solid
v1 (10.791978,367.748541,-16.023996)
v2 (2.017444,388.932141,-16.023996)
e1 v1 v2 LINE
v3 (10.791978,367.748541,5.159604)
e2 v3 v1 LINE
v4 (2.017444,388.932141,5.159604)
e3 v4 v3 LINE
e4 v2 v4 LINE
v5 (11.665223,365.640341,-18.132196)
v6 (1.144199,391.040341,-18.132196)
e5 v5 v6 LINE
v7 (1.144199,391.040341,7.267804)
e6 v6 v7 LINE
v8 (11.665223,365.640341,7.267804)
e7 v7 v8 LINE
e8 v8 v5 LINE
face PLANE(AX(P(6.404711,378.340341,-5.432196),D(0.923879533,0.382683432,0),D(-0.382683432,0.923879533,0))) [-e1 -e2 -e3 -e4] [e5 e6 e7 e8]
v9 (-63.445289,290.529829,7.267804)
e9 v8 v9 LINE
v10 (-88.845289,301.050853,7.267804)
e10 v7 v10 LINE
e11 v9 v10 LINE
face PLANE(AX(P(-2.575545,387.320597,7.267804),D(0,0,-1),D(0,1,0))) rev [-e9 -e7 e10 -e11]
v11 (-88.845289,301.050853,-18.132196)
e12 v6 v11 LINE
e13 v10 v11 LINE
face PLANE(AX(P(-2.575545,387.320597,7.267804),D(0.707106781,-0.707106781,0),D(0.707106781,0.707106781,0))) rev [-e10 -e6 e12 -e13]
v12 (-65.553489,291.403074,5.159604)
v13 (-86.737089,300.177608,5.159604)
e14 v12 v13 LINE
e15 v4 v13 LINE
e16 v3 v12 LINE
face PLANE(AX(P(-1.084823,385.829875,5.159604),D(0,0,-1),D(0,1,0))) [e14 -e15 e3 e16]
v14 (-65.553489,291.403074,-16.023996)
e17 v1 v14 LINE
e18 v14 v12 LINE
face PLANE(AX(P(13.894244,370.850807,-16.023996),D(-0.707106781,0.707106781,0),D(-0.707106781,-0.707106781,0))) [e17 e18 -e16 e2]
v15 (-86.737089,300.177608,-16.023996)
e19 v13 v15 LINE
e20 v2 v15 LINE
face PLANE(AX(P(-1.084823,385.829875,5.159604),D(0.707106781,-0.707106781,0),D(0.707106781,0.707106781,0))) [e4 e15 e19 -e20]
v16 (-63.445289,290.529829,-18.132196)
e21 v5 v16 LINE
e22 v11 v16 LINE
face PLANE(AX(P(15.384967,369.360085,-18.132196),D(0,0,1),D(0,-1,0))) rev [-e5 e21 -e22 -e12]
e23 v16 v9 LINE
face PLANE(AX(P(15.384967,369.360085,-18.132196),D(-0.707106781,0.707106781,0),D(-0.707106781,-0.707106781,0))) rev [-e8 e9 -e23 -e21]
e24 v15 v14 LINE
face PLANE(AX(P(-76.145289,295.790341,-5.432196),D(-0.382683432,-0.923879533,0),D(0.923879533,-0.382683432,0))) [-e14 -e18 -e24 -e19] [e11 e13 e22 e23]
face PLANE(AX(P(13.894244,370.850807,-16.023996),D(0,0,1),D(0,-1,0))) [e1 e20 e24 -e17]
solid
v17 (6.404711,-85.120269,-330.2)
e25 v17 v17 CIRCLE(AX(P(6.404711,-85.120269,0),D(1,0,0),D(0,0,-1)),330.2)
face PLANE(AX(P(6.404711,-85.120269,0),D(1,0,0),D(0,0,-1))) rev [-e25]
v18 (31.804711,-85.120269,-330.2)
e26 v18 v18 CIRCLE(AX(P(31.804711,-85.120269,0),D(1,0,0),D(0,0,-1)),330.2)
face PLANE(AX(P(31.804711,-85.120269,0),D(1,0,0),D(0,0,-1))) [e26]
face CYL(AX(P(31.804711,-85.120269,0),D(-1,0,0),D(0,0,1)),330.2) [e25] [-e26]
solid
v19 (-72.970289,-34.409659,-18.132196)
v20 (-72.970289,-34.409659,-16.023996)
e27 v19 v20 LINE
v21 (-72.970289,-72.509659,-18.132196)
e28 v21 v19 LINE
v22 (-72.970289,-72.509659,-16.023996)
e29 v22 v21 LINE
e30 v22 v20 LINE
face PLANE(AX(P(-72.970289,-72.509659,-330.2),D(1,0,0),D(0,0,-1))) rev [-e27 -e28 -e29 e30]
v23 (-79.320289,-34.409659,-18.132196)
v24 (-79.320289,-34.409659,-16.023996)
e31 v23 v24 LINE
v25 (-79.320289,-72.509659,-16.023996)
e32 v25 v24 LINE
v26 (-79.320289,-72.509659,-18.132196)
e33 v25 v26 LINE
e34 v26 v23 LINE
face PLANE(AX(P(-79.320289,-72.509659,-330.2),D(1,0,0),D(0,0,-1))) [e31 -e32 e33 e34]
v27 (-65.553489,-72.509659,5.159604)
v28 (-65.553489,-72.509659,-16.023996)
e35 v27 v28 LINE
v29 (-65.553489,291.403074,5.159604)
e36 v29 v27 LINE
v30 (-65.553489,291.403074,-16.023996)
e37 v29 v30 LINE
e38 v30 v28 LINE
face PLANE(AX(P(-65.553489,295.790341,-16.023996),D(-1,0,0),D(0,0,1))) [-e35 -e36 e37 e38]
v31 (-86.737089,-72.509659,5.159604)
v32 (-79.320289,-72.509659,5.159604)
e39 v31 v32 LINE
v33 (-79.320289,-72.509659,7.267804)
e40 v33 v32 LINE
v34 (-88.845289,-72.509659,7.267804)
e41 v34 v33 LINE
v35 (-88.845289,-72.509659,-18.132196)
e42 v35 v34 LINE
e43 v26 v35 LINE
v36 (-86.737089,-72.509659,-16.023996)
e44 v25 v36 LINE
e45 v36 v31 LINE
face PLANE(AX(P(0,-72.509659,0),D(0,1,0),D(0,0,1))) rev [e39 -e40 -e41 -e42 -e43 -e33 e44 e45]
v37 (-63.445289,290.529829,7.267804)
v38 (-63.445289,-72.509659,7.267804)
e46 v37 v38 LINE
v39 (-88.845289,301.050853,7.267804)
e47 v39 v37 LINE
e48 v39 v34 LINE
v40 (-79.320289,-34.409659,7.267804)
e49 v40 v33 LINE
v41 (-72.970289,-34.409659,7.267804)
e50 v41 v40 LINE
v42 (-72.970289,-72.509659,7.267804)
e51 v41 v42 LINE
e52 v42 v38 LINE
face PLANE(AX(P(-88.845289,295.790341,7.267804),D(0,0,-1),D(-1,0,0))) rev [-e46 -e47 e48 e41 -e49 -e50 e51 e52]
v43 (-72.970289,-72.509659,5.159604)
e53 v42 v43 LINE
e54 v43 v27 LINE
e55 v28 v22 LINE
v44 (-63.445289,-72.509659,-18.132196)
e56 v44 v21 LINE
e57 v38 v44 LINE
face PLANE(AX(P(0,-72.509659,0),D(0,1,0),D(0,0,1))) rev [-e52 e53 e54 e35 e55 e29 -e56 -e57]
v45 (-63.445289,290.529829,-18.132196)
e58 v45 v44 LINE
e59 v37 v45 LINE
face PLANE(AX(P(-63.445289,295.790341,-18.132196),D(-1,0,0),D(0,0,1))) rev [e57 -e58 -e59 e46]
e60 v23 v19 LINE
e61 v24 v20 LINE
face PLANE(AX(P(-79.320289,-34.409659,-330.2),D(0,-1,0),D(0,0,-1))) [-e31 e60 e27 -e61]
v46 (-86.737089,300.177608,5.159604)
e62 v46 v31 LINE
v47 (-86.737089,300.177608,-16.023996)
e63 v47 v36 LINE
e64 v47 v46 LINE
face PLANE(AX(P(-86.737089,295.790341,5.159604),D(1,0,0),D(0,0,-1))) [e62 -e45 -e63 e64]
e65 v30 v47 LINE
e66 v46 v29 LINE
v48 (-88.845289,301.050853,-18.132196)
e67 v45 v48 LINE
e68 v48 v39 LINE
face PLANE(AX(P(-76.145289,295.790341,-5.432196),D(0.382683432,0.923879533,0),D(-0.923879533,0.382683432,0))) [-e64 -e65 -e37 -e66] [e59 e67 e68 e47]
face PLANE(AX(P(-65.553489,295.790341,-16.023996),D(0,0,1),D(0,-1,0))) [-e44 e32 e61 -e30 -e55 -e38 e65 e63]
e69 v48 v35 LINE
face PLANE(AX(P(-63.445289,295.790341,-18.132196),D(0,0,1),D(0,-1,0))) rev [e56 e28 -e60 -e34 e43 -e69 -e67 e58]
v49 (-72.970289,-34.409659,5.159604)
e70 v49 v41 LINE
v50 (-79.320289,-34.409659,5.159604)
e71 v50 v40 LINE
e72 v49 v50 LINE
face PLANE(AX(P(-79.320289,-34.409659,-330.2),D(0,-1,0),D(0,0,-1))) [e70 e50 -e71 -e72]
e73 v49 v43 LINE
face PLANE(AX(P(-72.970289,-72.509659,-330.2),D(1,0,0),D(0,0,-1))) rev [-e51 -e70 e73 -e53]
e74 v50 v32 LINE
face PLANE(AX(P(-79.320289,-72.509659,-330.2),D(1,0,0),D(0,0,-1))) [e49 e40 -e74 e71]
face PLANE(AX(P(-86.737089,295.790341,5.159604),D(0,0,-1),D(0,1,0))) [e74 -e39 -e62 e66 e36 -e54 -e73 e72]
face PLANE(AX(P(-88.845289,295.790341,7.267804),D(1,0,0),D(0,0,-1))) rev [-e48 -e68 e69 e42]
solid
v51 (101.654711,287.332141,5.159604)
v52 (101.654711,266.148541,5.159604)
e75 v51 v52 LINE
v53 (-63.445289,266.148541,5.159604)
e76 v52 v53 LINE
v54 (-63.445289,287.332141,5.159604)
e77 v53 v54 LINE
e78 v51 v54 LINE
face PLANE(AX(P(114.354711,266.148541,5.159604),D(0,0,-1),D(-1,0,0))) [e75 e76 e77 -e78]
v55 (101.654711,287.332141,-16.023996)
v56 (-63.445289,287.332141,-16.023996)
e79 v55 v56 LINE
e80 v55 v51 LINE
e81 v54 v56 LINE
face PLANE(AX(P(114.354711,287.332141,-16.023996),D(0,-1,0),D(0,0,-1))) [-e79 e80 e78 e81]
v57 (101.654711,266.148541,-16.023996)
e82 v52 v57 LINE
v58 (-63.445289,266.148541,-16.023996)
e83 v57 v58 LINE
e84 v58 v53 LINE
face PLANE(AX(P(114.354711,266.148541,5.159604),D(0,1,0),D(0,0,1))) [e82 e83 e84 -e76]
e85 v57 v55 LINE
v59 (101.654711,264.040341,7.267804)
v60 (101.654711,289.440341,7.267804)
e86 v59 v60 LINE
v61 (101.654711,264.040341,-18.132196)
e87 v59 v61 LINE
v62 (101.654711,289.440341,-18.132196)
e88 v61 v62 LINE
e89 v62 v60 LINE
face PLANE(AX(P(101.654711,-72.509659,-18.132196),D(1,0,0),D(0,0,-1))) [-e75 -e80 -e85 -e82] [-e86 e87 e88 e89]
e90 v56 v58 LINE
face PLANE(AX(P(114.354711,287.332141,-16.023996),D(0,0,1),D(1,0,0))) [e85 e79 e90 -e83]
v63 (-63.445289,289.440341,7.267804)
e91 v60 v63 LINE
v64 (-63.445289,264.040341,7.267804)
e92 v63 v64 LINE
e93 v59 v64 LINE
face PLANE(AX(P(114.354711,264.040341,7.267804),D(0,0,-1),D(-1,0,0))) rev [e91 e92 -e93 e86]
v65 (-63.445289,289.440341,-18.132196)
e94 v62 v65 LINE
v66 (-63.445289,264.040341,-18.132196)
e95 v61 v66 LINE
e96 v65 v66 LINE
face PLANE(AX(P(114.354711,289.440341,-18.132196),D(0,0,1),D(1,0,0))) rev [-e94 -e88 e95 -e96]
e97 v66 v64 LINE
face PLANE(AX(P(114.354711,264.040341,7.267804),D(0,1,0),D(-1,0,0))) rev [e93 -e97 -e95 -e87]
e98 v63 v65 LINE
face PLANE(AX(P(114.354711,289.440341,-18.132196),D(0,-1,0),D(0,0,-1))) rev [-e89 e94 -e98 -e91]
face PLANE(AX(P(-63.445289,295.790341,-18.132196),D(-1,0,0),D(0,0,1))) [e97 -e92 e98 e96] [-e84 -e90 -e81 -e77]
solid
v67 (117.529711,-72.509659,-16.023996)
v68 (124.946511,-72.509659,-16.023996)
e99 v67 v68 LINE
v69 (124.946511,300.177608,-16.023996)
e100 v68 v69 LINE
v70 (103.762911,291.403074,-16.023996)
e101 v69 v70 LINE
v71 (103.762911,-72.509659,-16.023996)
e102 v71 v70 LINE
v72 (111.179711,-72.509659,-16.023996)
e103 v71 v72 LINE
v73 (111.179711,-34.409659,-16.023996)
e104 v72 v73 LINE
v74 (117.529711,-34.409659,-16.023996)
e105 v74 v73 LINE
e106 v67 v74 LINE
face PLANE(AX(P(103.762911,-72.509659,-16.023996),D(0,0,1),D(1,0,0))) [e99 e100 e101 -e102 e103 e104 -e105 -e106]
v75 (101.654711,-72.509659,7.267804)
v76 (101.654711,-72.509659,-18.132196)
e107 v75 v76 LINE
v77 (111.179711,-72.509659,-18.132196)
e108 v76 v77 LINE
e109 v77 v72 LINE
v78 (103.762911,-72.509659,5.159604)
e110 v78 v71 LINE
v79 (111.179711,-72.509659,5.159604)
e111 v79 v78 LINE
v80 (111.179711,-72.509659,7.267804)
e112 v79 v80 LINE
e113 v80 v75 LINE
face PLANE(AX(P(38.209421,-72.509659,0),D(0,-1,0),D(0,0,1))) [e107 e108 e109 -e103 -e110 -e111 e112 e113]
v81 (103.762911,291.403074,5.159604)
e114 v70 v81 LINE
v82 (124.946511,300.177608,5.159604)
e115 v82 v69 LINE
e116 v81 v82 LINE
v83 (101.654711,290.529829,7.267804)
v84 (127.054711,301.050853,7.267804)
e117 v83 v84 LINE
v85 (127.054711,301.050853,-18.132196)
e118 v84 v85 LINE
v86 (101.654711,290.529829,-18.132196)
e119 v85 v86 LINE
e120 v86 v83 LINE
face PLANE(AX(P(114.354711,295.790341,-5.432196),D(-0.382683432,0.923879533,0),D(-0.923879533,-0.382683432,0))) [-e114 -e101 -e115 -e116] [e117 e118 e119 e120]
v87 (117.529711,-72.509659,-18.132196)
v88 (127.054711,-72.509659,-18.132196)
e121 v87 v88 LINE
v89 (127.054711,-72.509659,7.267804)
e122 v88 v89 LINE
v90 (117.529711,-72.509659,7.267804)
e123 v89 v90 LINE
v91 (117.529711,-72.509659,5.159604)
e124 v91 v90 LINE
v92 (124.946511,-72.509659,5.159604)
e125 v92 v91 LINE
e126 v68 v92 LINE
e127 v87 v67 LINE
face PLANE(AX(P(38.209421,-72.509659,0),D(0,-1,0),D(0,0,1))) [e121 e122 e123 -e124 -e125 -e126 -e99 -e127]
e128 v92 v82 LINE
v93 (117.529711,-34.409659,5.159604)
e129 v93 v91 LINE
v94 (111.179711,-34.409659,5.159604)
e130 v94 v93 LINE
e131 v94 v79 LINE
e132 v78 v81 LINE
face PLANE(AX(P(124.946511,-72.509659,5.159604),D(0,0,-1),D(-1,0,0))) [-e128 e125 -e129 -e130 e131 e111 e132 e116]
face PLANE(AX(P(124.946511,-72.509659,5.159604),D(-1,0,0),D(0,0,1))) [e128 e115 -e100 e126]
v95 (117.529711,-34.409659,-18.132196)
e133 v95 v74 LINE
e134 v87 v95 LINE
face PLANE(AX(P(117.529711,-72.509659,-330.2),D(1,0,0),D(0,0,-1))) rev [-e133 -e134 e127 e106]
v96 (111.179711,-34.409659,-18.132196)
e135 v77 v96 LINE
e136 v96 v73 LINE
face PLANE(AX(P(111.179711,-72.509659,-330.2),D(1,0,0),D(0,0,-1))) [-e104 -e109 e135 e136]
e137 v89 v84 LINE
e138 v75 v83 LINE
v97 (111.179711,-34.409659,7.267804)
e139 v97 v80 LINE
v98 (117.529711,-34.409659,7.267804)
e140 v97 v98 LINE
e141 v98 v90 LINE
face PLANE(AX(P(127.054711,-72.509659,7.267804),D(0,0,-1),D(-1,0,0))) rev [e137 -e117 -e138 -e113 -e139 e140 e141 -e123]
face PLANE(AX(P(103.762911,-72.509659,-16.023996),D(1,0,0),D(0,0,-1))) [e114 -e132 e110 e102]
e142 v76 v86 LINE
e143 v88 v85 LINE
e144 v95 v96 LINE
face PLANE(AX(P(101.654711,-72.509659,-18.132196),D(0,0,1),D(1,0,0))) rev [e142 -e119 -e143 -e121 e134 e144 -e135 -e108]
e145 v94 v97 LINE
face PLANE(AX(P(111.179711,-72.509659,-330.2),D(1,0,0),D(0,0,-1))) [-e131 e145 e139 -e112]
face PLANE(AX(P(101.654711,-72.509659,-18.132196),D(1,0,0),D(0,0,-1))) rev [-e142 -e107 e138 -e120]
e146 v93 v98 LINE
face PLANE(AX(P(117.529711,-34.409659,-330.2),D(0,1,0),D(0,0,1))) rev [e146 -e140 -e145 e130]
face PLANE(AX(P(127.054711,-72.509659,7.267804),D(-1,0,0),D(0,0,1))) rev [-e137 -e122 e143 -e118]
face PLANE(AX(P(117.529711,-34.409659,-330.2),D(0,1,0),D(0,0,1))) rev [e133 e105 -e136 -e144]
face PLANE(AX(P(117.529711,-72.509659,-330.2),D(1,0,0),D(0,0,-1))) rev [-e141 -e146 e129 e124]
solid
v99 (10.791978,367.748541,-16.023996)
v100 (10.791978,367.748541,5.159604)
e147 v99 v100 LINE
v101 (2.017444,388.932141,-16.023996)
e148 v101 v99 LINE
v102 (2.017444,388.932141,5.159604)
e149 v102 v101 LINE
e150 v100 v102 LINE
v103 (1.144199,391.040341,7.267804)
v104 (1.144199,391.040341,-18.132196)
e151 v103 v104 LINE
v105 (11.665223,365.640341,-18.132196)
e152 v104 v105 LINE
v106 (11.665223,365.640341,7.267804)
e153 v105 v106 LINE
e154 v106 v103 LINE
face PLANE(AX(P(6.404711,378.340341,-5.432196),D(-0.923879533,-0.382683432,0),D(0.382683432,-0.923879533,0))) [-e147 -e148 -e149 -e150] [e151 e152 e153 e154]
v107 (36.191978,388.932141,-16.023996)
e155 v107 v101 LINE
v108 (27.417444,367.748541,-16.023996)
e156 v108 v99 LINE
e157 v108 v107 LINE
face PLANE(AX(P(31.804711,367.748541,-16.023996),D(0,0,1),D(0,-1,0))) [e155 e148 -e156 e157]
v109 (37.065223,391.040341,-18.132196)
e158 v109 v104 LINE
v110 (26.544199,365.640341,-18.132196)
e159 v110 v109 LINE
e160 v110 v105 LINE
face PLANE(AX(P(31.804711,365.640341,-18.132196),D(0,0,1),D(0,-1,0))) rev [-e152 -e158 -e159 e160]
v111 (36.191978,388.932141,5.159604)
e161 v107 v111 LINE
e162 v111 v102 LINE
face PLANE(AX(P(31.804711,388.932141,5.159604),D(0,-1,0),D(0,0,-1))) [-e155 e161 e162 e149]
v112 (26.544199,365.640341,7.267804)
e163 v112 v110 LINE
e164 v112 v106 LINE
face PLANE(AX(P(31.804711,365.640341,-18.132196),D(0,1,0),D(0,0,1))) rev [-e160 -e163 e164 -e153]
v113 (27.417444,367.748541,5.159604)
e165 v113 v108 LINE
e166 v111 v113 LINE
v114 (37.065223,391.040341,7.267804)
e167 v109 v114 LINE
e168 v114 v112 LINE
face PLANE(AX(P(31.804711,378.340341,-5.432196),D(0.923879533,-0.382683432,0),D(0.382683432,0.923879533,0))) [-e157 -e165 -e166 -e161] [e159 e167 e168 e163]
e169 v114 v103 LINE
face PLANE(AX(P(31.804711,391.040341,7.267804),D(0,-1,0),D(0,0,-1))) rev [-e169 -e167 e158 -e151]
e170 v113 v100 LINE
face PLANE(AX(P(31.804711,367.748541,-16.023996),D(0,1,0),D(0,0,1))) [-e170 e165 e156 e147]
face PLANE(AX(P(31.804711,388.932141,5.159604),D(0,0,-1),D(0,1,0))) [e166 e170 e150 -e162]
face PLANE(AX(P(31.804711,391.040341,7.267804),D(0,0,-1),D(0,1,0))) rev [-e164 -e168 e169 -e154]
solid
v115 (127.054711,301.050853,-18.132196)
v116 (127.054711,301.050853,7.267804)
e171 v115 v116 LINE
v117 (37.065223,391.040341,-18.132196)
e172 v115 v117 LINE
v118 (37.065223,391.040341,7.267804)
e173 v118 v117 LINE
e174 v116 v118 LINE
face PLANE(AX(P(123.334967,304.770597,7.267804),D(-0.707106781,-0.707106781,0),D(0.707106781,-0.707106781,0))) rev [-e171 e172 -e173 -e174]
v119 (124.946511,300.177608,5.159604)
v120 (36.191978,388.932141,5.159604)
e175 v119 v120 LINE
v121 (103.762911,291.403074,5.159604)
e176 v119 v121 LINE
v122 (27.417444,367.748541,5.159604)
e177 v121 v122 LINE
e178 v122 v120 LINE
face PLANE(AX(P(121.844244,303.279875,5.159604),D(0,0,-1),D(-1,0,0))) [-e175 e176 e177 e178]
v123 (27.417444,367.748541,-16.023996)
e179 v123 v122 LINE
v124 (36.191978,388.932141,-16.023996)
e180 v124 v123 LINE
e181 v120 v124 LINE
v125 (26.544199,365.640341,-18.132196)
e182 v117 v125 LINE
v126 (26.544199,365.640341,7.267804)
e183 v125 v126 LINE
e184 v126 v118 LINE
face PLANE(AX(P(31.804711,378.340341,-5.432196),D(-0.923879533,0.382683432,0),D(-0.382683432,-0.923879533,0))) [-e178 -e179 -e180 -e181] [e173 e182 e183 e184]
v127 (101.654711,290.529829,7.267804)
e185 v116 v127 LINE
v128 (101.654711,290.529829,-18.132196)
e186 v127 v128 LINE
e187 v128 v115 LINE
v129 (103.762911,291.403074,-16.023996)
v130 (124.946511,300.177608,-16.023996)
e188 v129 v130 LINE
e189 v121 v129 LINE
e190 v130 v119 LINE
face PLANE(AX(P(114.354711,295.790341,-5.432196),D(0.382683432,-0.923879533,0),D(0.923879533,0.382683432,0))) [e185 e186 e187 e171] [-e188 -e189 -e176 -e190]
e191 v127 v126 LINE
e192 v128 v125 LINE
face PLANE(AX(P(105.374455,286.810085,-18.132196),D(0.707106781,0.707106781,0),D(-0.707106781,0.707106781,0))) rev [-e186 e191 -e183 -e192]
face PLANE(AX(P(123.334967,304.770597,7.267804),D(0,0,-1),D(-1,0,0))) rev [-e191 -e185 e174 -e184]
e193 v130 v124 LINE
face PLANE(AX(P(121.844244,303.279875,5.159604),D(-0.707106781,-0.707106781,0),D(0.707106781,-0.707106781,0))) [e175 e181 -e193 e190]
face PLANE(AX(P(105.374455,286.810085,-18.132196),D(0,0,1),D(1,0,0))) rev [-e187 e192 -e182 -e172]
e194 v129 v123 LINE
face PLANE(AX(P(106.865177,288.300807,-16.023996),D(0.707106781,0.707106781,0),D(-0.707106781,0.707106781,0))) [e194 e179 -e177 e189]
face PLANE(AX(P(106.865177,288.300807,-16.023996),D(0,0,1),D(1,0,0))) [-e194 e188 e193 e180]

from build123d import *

# Parameters (mm, degrees)
WHEEL_START                                    = 6.404710745
WHEEL_OUTLINE_R                                = 330.2
WHEEL_DEPTH                                    = 25.4
SKETCH11_W                                     = 25.4
SKETCH11_H                                     = 25.4
SKETCH11_W_2                                   = 21.1836
SKETCH11_H_2                                   = 21.1836
AL_TUBE_SQUARE_AL_TUBE_1_SQR_X_0_083_WAL_DEPTH = 376.739487758
SKETCH11_ON_SEGMENT_2_W                        = 25.4
SKETCH11_ON_SEGMENT_2_H                        = 25.4
SKETCH11_ON_SEGMENT_2_W_2                      = 21.1836
SKETCH11_ON_SEGMENT_2_H_2                      = 21.1836
AL_TUBE_SQUARE_AL_TUBE_1_SQR_X_0_083_3_DEPTH   = 133.622305091
SKETCH11_ON_SEGMENT_3_W                        = 25.4
SKETCH11_ON_SEGMENT_3_H                        = 25.4
SKETCH11_ON_SEGMENT_3_W_2                      = 21.1836
SKETCH11_ON_SEGMENT_3_H_2                      = 21.1836
AL_TUBE_SQUARE_AL_TUBE_1_SQR_X_0_083_5_DEPTH   = 42.278975516
SKETCH11_ON_SEGMENT_4_W                        = 25.4
SKETCH11_ON_SEGMENT_4_H                        = 25.4
SKETCH11_ON_SEGMENT_4_W_2                      = 21.1836
SKETCH11_ON_SEGMENT_4_H_2                      = 21.1836
AL_TUBE_SQUARE_AL_TUBE_1_SQR_X_0_083_7_DEPTH   = 133.622305091
SKETCH11_ON_SEGMENT_5_W                        = 25.4
SKETCH11_ON_SEGMENT_5_H                        = 25.4
SKETCH11_ON_SEGMENT_5_W_2                      = 21.1836
SKETCH11_ON_SEGMENT_5_H_2                      = 21.1836
AL_TUBE_SQUARE_AL_TUBE_1_SQR_X_0_083_9_DEPTH   = 376.739487758
SKETCH11_ON_SEGMENT_6_W                        = 25.4
SKETCH11_ON_SEGMENT_6_H                        = 25.4
SKETCH11_ON_SEGMENT_6_W_2                      = 21.1836
SKETCH11_ON_SEGMENT_6_H_2                      = 21.1836
AL_TUBE_SQUARE_AL_TUBE_1_SQR_X_0_083_10_DEPTH  = 192.500000002
CUT_EXTRUDE1_DEPTH                             = 551.016675996
CUT_EXTRUDE1_DEPTH_BACK                        = 551.016675996
SKETCH16_W                                     = 6.35
SKETCH16_H                                     = 38.1


# Read off the part's stored shape, not the designer's step: wheel
with BuildPart() as part:
    # wheel outline → wheel (new body)
    with BuildSketch(Plane.YZ.offset(WHEEL_START)):
        with Locations((-85.120268568, 0)):
            Circle(WHEEL_OUTLINE_R)
    extrude(amount=WHEEL_DEPTH)


with BuildPart() as body_2:
    # Sketch11 → Al tube square AL TUBE 1 SQR X 0.083 WALL(1) (new body)
    with BuildSketch(Plane(origin=(-76.145289254, -72.509659064, -5.432195809), x_dir=(1, 0, 0), z_dir=(0, 1, 0))):
        Rectangle(SKETCH11_W, SKETCH11_H)
        Rectangle(SKETCH11_W_2, SKETCH11_H_2, mode=Mode.SUBTRACT)
    extrude(amount=AL_TUBE_SQUARE_AL_TUBE_1_SQR_X_0_083_WAL_DEPTH)

    # Al tube square AL TUBE 1 SQR X 0.083 2
    split(bisect_by=Plane(origin=(-76.145289254, 295.790340936, -5.432195809), x_dir=(0.923879533, -0.382683432, 0), z_dir=(-0.382683432, -0.923879533, 0)), keep=Keep.TOP)


with BuildPart() as body_3:
    # Sketch11 on segment 2 (carried to segment 2) → Al tube square AL TUBE 1 SQR X 0.083 3 (new body)
    with BuildSketch(Plane(origin=(-82.112908278, 289.822721913, -5.432195809), x_dir=(0.707106781, -0.707106781, 0), z_dir=(0.707106781, 0.707106781, 0))):
        Rectangle(SKETCH11_ON_SEGMENT_2_W, SKETCH11_ON_SEGMENT_2_H)
        Rectangle(SKETCH11_ON_SEGMENT_2_W_2, SKETCH11_ON_SEGMENT_2_H_2, mode=Mode.SUBTRACT)
    extrude(amount=AL_TUBE_SQUARE_AL_TUBE_1_SQR_X_0_083_3_DEPTH)

    # Al tube square AL TUBE 1 SQR X 0.083 3 m
    split(bisect_by=Plane(origin=(-76.145289254, 295.790340936, -5.432195809), x_dir=(-0.923879533, 0.382683432, 0), z_dir=(0.382683432, 0.923879533, 0)), keep=Keep.TOP)

    # Al tube square AL TUBE 1 SQR X 0.083 4
    split(bisect_by=Plane(origin=(6.404710747, 378.340340937, -5.432195809), x_dir=(0.382683432, -0.923879533, 0), z_dir=(-0.923879533, -0.382683432, 0)), keep=Keep.TOP)


with BuildPart() as body_4:
    # Sketch11 on segment 3 (carried to segment 3) → Al tube square AL TUBE 1 SQR X 0.083 5 (new body)
    with BuildSketch(Plane(origin=(-2.034777011, 378.340340937, -5.432195809), x_dir=(0, -1, 0), z_dir=(1, 0, 0))):
        Rectangle(SKETCH11_ON_SEGMENT_3_W, SKETCH11_ON_SEGMENT_3_H)
        Rectangle(SKETCH11_ON_SEGMENT_3_W_2, SKETCH11_ON_SEGMENT_3_H_2, mode=Mode.SUBTRACT)
    extrude(amount=AL_TUBE_SQUARE_AL_TUBE_1_SQR_X_0_083_5_DEPTH)

    # Al tube square AL TUBE 1 SQR X 0.083 5 m
    split(bisect_by=Plane(origin=(31.804710747, 378.340340937, -5.432195809), x_dir=(-0.382683432, -0.923879533, 0), z_dir=(-0.923879533, 0.382683432, 0)), keep=Keep.TOP)

    # Al tube square AL TUBE 1 SQR X 0.083 6
    split(bisect_by=Plane(origin=(6.404710747, 378.340340937, -5.432195809), x_dir=(-0.382683432, 0.923879533, 0), z_dir=(0.923879533, 0.382683432, 0)), keep=Keep.TOP)


with BuildPart() as body_5:
    # Sketch11 on segment 4 (carried to segment 4) → Al tube square AL TUBE 1 SQR X 0.083 7 (new body)
    with BuildSketch(Plane(origin=(25.837091724, 384.30795996, -5.432195809), x_dir=(-0.707106781, -0.707106781, 0), z_dir=(0.707106781, -0.707106781, 0))):
        Rectangle(SKETCH11_ON_SEGMENT_4_W, SKETCH11_ON_SEGMENT_4_H)
        Rectangle(SKETCH11_ON_SEGMENT_4_W_2, SKETCH11_ON_SEGMENT_4_H_2, mode=Mode.SUBTRACT)
    extrude(amount=AL_TUBE_SQUARE_AL_TUBE_1_SQR_X_0_083_7_DEPTH)

    # Al tube square AL TUBE 1 SQR X 0.083 7 m
    split(bisect_by=Plane(origin=(31.804710747, 378.340340937, -5.432195809), x_dir=(0.382683432, 0.923879533, 0), z_dir=(0.923879533, -0.382683432, 0)), keep=Keep.TOP)

    # Al tube square AL TUBE 1 SQR X 0.083 8
    split(bisect_by=Plane(origin=(114.354710748, 295.790340936, -5.432195809), x_dir=(-0.923879533, -0.382683432, 0), z_dir=(-0.382683432, 0.923879533, 0)), keep=Keep.TOP)


with BuildPart() as body_6:
    # Sketch11 on segment 5 (carried to segment 5) → Al tube square AL TUBE 1 SQR X 0.083 9 (new body)
    with BuildSketch(Plane(origin=(114.354710748, 304.229828694, -5.432195809), x_dir=(-1, 0, 0), z_dir=(0, -1, 0))):
        Rectangle(SKETCH11_ON_SEGMENT_5_W, SKETCH11_ON_SEGMENT_5_H)
        Rectangle(SKETCH11_ON_SEGMENT_5_W_2, SKETCH11_ON_SEGMENT_5_H_2, mode=Mode.SUBTRACT)
    extrude(amount=AL_TUBE_SQUARE_AL_TUBE_1_SQR_X_0_083_9_DEPTH)

    # Al tube square AL TUBE 1 SQR X 0.083 9 m
    split(bisect_by=Plane(origin=(114.354710748, 295.790340936, -5.432195809), x_dir=(0.923879533, 0.382683432, 0), z_dir=(0.382683432, -0.923879533, 0)), keep=Keep.TOP)


with BuildPart() as body_7:
    # Sketch11 on segment 6 (carried to segment 6) → Al tube square AL TUBE 1 SQR X 0.083 10 (new body)
    with BuildSketch(Plane(origin=(-77.145289254, 276.740340936, -5.432195809), x_dir=(0, -1, 0), z_dir=(1, 0, 0))):
        Rectangle(SKETCH11_ON_SEGMENT_6_W, SKETCH11_ON_SEGMENT_6_H)
        Rectangle(SKETCH11_ON_SEGMENT_6_W_2, SKETCH11_ON_SEGMENT_6_H_2, mode=Mode.SUBTRACT)
    extrude(amount=AL_TUBE_SQUARE_AL_TUBE_1_SQR_X_0_083_10_DEPTH)

    # Al tube square AL TUBE 1 SQR X 0.083 11
    split(bisect_by=Plane(origin=(-63.445289254, 276.740340936, -5.432195809), x_dir=(0, 1, 0), z_dir=(1, 0, 0)), keep=Keep.TOP)

    # Al tube square AL TUBE 1 SQR X 0.083 12
    split(bisect_by=Plane(origin=(101.654710748, 276.740340936, -5.432195809), x_dir=(0, -1, 0), z_dir=(-1, 0, 0)), keep=Keep.TOP)


with BuildPart() as cut_extrude1_tool:
    # Sketch16 → Cut-Extrude1 (new, two sides: drawn at the far end of the back side and taken through both)
    with BuildSketch(Plane.XY.offset(7.267804191).offset(-CUT_EXTRUDE1_DEPTH_BACK)):
        with Locations((-76.145289254, -53.459659064)):
            Rectangle(SKETCH16_W, SKETCH16_H)
        with Locations((114.354710748, -53.459659064)):
            Rectangle(SKETCH16_W, SKETCH16_H)
    extrude(amount=CUT_EXTRUDE1_DEPTH + CUT_EXTRUDE1_DEPTH_BACK)


with BuildPart() as body_2_1:
    add(body_2.part)

    # Cut-Extrude1: cut by cut_extrude1_tool
    add(cut_extrude1_tool.part, mode=Mode.SUBTRACT)


with BuildPart() as body_6_1:
    add(body_6.part)

    # Cut-Extrude1: cut by cut_extrude1_tool
    add(cut_extrude1_tool.part, mode=Mode.SUBTRACT)


solid = Compound([part.part, body_3.part, body_4.part, body_5.part, body_7.part, body_2_1.part, body_6_1.part])
